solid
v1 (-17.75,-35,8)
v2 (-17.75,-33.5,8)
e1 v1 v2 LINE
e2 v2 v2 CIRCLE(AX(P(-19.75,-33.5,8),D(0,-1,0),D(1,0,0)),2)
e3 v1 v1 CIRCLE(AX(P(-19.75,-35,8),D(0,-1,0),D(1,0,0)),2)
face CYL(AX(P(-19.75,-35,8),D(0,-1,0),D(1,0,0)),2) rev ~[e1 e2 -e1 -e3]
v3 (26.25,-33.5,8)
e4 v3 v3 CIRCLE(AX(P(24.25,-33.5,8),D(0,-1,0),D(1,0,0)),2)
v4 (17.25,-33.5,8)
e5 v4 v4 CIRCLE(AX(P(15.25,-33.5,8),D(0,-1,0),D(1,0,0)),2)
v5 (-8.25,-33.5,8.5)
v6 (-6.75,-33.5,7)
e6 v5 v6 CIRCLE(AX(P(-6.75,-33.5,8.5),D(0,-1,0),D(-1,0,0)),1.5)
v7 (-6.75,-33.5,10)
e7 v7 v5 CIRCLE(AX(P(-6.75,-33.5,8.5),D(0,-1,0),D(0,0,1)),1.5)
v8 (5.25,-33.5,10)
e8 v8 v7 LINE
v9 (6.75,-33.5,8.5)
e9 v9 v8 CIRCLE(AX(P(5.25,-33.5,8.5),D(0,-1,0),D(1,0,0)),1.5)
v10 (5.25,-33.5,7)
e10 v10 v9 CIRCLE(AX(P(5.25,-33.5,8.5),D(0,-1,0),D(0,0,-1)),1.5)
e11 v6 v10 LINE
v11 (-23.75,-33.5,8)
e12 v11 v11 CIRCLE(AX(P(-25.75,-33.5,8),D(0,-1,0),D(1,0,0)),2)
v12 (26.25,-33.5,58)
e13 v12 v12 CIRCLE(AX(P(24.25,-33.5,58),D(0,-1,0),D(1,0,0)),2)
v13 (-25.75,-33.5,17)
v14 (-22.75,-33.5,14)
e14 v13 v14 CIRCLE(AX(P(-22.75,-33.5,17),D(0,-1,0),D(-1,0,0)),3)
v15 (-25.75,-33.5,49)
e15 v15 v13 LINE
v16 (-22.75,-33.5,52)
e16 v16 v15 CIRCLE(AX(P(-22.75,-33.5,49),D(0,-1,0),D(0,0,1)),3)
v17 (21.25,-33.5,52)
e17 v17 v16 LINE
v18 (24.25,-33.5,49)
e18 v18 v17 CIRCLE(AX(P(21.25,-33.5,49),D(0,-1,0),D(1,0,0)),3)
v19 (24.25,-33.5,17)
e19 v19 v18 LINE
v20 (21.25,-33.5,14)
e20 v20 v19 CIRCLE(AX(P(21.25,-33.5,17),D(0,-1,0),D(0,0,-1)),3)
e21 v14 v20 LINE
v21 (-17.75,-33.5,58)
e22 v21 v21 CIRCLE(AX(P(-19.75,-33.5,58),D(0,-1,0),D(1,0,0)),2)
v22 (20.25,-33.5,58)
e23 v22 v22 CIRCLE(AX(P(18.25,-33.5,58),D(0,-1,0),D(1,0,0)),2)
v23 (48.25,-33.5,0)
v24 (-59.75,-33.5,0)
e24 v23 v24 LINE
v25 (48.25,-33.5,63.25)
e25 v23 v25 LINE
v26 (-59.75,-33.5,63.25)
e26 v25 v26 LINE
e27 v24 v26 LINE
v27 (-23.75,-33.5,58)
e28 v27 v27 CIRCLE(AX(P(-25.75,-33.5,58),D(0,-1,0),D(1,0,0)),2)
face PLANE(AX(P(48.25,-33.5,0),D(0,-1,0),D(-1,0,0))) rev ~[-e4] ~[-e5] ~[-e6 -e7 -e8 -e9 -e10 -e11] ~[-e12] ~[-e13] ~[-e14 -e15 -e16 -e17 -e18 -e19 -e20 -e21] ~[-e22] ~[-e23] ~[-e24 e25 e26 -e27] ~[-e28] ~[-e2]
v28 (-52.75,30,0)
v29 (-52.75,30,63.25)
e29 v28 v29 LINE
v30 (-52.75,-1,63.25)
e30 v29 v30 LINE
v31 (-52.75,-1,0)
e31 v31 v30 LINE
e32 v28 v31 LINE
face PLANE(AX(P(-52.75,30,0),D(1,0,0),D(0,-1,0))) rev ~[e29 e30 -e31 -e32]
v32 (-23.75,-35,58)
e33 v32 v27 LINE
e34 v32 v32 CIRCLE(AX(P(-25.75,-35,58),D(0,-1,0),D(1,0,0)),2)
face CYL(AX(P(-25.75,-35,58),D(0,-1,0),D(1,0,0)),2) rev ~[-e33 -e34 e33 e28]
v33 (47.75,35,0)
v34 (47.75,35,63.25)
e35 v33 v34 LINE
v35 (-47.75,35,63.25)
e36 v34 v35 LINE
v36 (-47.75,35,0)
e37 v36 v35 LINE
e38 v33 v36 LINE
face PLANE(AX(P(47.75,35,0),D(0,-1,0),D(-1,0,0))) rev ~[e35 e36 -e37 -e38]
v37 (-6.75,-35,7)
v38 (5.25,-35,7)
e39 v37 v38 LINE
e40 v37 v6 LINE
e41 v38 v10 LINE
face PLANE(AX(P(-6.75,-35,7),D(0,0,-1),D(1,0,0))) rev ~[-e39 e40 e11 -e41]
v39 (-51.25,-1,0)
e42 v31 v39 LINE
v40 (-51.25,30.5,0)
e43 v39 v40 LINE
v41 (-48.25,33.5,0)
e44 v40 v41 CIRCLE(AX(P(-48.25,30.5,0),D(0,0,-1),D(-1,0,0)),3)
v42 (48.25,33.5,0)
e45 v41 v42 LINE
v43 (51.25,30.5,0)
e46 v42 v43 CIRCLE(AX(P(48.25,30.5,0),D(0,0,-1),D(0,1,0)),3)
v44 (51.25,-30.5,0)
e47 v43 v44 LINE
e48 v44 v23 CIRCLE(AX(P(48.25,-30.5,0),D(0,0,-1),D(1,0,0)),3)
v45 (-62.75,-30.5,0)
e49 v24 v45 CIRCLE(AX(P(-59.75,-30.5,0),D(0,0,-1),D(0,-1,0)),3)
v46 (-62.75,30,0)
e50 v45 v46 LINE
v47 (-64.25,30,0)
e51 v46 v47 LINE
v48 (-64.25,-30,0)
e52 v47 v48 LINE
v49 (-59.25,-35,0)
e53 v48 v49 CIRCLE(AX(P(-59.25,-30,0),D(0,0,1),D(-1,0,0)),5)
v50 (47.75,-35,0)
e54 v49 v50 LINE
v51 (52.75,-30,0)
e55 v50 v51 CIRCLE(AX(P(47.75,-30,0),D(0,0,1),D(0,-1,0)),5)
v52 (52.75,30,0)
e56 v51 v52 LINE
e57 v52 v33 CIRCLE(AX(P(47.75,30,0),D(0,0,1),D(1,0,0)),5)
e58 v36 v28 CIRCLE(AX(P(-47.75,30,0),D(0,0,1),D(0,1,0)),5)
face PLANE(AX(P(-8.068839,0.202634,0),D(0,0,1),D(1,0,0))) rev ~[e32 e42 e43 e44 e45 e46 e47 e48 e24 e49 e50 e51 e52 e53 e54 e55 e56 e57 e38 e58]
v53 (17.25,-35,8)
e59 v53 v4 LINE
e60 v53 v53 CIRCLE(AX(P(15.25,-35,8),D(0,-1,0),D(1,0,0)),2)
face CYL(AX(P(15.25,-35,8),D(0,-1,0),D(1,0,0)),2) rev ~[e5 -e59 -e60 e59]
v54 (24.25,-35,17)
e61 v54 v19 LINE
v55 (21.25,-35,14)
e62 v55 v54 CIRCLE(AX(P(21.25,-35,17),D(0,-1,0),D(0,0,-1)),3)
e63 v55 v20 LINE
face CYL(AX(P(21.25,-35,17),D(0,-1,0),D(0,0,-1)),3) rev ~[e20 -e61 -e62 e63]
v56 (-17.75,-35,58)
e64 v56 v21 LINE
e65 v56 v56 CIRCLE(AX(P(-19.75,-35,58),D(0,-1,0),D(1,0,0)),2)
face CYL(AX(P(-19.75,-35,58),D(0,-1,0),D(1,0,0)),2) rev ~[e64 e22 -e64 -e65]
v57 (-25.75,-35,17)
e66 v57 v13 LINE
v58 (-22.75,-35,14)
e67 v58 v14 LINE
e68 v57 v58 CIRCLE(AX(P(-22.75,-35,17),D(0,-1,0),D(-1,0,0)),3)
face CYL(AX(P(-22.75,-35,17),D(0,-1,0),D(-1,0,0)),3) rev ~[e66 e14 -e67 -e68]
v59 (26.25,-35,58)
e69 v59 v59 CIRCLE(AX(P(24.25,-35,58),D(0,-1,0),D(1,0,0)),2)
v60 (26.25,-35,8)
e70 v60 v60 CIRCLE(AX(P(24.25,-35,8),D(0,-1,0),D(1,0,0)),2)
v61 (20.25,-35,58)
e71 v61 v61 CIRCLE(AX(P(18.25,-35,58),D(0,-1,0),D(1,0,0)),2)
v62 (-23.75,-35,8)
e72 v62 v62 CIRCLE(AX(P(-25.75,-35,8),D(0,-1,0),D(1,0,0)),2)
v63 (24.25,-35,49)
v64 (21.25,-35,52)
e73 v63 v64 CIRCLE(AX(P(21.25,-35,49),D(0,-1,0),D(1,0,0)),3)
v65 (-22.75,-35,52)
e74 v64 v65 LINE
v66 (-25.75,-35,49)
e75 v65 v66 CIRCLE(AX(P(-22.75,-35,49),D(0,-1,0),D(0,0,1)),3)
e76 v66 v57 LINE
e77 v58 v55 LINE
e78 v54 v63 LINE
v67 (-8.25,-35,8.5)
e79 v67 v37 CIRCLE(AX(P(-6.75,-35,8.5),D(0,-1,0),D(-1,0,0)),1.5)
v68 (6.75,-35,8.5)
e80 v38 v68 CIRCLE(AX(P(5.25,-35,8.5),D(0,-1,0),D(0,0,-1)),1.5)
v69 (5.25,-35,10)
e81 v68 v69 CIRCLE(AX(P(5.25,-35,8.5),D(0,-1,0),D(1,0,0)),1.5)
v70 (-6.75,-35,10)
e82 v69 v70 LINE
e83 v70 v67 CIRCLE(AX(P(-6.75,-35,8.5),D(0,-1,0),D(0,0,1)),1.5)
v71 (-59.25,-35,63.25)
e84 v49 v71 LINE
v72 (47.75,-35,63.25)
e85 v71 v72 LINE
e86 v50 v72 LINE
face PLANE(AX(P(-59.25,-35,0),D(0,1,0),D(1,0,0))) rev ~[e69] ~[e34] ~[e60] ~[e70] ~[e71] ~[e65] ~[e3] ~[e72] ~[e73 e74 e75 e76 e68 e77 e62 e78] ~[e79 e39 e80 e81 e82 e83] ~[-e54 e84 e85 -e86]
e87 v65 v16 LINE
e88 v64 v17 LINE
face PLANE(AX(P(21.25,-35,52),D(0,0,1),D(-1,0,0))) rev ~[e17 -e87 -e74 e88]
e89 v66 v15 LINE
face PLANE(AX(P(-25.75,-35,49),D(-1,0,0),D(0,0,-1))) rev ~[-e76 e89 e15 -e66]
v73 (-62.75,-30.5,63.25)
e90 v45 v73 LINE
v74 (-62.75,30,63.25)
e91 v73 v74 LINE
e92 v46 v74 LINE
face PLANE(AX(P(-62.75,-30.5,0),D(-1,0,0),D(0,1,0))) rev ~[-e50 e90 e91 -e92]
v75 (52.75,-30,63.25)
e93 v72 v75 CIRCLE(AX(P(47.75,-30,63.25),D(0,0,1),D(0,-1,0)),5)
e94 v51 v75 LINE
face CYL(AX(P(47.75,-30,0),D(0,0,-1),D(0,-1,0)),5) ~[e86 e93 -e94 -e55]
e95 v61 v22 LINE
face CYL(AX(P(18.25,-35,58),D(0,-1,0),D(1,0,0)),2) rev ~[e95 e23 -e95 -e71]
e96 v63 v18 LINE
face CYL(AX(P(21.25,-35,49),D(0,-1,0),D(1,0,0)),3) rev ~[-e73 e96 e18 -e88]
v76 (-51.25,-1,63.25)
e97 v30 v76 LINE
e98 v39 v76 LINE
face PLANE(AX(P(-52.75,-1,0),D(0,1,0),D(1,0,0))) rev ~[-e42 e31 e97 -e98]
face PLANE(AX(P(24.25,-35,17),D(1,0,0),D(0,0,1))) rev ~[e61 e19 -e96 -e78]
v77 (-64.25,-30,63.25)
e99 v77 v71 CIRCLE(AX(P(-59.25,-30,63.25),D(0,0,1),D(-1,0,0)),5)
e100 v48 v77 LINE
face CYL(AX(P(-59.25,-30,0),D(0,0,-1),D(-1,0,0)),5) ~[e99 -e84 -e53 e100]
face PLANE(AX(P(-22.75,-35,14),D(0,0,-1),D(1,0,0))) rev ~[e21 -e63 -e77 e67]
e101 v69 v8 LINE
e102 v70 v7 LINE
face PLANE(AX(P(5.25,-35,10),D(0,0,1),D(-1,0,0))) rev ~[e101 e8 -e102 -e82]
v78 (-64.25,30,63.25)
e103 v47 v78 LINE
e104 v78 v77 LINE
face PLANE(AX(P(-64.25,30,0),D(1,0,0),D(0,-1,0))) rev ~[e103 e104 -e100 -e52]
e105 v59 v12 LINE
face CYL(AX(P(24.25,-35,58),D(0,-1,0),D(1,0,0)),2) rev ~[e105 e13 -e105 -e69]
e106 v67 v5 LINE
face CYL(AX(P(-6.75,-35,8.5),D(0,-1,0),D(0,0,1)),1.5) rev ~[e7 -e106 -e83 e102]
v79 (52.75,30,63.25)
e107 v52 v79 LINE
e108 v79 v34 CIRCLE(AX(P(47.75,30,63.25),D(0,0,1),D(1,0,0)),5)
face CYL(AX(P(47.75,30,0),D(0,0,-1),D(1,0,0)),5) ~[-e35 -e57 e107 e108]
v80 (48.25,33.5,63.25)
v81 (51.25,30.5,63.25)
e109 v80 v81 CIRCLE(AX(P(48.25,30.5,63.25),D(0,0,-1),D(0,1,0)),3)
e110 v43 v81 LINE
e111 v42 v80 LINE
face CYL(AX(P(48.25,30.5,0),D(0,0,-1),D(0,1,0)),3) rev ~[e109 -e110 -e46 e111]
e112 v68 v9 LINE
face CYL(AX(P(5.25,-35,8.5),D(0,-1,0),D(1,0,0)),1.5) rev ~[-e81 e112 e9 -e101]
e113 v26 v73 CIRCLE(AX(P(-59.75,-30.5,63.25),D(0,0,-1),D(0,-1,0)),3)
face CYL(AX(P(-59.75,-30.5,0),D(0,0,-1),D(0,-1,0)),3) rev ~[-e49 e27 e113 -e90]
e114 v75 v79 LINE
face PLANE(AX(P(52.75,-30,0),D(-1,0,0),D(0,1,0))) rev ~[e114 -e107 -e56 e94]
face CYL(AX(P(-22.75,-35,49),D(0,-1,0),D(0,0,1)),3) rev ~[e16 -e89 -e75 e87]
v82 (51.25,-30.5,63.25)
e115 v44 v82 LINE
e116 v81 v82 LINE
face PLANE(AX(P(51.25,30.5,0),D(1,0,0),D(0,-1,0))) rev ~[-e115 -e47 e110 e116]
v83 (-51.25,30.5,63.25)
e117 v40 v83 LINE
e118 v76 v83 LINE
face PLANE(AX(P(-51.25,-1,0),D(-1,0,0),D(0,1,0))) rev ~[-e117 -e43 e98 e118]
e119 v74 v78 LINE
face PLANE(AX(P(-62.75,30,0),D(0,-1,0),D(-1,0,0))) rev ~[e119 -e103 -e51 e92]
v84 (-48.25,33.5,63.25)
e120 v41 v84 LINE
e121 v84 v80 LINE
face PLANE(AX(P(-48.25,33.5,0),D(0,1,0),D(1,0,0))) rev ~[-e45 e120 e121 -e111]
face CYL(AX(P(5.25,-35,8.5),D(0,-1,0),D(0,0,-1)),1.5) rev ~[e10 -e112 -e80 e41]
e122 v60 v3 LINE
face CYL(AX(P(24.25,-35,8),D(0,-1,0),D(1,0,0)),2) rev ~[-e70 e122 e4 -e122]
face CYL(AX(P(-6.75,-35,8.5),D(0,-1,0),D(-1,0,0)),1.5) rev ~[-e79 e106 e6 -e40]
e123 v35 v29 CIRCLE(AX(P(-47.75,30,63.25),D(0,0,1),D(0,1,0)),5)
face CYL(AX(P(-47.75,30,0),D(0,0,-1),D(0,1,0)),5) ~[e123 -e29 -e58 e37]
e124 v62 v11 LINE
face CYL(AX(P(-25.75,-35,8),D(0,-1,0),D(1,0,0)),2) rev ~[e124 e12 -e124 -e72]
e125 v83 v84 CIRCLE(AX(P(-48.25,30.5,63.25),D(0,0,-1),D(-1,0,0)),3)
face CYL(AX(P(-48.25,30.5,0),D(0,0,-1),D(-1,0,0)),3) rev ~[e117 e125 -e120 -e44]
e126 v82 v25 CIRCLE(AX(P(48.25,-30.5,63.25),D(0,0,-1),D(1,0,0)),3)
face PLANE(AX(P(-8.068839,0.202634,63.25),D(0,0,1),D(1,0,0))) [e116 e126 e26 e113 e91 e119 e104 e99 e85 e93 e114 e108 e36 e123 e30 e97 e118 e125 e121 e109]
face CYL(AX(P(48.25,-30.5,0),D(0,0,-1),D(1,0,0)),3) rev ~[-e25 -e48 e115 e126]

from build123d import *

# Parameters (mm, degrees)
F1_DEPTH = 63.25
F2_R     = 2
F3_DEPTH = 25


# Not quite as in the source:
# - a feature names something its author has since deleted; it is built from what else it names


with BuildPart() as f1:
    # F0 (on Top) → F1 (new body)
    with BuildSketch(Plane.XY):
        with BuildLine():
            Line((-62.75, -30.5), (-62.75, 30))
            Line((-62.75, 30), (-64.25, 30))
            Line((-64.25, 30), (-64.25, -30))
            ThreePointArc((-64.25, -30), (-62.7855339059, -33.5355339059), (-59.25, -35))
            Line((-59.25, -35), (47.75, -35))
            ThreePointArc((47.75, -35), (51.2855339059, -33.5355339059), (52.75, -30))
            Line((52.75, -30), (52.75, 30))
            ThreePointArc((52.75, 30), (51.2855339059, 33.5355339059), (47.75, 35))
            Line((47.75, 35), (-47.75, 35))
            ThreePointArc((-47.75, 35), (-51.2855339059, 33.5355339059), (-52.75, 30))
            Line((-52.75, 30), (-52.75, -1))
            Line((-52.75, -1), (-51.25, -1))
            Line((-51.25, -1), (-51.25, 30.5))
            ThreePointArc((-51.25, 30.5), (-50.3713203436, 32.6213203436), (-48.25, 33.5))
            Line((-48.25, 33.5), (48.25, 33.5))
            ThreePointArc((48.25, 33.5), (50.3713203436, 32.6213203436), (51.25, 30.5))
            Line((51.25, 30.5), (51.25, -30.5))
            ThreePointArc((51.25, -30.5), (50.3713203436, -32.6213203436), (48.25, -33.5))
            Line((48.25, -33.5), (-59.75, -33.5))
            ThreePointArc((-59.75, -33.5), (-61.8713203436, -32.6213203436), (-62.75, -30.5))
        make_face()
    extrude(amount=F1_DEPTH)

    # F2 (on face) → F3 (cut)
    with BuildSketch(Plane.XZ.offset(35)):
        with BuildLine():
            Line((21.25, 52), (-22.75, 52))
            ThreePointArc((-22.75, 52), (-24.8713203436, 51.1213203436), (-25.75, 49))
            Line((-25.75, 49), (-25.75, 17))
            ThreePointArc((-25.75, 17), (-24.8713203436, 14.8786796564), (-22.75, 14))
            Line((-22.75, 14), (21.25, 14))
            ThreePointArc((21.25, 14), (23.3713203436, 14.8786796564), (24.25, 17))
            Line((24.25, 17), (24.25, 49))
            ThreePointArc((24.25, 49), (23.3713203436, 51.1213203436), (21.25, 52))
        make_face()
        with Locations((-25.75, 58)):
            Circle(F2_R)
        with Locations((24.25, 58)):
            Circle(F2_R)
        with Locations((24.25, 8)):
            Circle(F2_R)
        with Locations((-25.75, 8)):
            Circle(F2_R)
        with BuildLine():
            ThreePointArc((-8.25, 8.5), (-7.8106601718, 7.4393398282), (-6.75, 7))
            Line((-6.75, 7), (5.25, 7))
            ThreePointArc((5.25, 7), (6.3106601718, 7.4393398282), (6.75, 8.5))
            ThreePointArc((6.75, 8.5), (6.3106601718, 9.5606601718), (5.25, 10))
            Line((5.25, 10), (-6.75, 10))
            ThreePointArc((-6.75, 10), (-7.8106601718, 9.5606601718), (-8.25, 8.5))
        make_face()
        with Locations((-19.75, 8)):
            Circle(F2_R)
        with Locations((-19.75, 58)):
            Circle(F2_R)
        with Locations((18.25, 58)):
            Circle(F2_R)
        with Locations((15.25, 8)):
            Circle(F2_R)
    extrude(amount=-F3_DEPTH, mode=Mode.SUBTRACT)


solid = f1.part
